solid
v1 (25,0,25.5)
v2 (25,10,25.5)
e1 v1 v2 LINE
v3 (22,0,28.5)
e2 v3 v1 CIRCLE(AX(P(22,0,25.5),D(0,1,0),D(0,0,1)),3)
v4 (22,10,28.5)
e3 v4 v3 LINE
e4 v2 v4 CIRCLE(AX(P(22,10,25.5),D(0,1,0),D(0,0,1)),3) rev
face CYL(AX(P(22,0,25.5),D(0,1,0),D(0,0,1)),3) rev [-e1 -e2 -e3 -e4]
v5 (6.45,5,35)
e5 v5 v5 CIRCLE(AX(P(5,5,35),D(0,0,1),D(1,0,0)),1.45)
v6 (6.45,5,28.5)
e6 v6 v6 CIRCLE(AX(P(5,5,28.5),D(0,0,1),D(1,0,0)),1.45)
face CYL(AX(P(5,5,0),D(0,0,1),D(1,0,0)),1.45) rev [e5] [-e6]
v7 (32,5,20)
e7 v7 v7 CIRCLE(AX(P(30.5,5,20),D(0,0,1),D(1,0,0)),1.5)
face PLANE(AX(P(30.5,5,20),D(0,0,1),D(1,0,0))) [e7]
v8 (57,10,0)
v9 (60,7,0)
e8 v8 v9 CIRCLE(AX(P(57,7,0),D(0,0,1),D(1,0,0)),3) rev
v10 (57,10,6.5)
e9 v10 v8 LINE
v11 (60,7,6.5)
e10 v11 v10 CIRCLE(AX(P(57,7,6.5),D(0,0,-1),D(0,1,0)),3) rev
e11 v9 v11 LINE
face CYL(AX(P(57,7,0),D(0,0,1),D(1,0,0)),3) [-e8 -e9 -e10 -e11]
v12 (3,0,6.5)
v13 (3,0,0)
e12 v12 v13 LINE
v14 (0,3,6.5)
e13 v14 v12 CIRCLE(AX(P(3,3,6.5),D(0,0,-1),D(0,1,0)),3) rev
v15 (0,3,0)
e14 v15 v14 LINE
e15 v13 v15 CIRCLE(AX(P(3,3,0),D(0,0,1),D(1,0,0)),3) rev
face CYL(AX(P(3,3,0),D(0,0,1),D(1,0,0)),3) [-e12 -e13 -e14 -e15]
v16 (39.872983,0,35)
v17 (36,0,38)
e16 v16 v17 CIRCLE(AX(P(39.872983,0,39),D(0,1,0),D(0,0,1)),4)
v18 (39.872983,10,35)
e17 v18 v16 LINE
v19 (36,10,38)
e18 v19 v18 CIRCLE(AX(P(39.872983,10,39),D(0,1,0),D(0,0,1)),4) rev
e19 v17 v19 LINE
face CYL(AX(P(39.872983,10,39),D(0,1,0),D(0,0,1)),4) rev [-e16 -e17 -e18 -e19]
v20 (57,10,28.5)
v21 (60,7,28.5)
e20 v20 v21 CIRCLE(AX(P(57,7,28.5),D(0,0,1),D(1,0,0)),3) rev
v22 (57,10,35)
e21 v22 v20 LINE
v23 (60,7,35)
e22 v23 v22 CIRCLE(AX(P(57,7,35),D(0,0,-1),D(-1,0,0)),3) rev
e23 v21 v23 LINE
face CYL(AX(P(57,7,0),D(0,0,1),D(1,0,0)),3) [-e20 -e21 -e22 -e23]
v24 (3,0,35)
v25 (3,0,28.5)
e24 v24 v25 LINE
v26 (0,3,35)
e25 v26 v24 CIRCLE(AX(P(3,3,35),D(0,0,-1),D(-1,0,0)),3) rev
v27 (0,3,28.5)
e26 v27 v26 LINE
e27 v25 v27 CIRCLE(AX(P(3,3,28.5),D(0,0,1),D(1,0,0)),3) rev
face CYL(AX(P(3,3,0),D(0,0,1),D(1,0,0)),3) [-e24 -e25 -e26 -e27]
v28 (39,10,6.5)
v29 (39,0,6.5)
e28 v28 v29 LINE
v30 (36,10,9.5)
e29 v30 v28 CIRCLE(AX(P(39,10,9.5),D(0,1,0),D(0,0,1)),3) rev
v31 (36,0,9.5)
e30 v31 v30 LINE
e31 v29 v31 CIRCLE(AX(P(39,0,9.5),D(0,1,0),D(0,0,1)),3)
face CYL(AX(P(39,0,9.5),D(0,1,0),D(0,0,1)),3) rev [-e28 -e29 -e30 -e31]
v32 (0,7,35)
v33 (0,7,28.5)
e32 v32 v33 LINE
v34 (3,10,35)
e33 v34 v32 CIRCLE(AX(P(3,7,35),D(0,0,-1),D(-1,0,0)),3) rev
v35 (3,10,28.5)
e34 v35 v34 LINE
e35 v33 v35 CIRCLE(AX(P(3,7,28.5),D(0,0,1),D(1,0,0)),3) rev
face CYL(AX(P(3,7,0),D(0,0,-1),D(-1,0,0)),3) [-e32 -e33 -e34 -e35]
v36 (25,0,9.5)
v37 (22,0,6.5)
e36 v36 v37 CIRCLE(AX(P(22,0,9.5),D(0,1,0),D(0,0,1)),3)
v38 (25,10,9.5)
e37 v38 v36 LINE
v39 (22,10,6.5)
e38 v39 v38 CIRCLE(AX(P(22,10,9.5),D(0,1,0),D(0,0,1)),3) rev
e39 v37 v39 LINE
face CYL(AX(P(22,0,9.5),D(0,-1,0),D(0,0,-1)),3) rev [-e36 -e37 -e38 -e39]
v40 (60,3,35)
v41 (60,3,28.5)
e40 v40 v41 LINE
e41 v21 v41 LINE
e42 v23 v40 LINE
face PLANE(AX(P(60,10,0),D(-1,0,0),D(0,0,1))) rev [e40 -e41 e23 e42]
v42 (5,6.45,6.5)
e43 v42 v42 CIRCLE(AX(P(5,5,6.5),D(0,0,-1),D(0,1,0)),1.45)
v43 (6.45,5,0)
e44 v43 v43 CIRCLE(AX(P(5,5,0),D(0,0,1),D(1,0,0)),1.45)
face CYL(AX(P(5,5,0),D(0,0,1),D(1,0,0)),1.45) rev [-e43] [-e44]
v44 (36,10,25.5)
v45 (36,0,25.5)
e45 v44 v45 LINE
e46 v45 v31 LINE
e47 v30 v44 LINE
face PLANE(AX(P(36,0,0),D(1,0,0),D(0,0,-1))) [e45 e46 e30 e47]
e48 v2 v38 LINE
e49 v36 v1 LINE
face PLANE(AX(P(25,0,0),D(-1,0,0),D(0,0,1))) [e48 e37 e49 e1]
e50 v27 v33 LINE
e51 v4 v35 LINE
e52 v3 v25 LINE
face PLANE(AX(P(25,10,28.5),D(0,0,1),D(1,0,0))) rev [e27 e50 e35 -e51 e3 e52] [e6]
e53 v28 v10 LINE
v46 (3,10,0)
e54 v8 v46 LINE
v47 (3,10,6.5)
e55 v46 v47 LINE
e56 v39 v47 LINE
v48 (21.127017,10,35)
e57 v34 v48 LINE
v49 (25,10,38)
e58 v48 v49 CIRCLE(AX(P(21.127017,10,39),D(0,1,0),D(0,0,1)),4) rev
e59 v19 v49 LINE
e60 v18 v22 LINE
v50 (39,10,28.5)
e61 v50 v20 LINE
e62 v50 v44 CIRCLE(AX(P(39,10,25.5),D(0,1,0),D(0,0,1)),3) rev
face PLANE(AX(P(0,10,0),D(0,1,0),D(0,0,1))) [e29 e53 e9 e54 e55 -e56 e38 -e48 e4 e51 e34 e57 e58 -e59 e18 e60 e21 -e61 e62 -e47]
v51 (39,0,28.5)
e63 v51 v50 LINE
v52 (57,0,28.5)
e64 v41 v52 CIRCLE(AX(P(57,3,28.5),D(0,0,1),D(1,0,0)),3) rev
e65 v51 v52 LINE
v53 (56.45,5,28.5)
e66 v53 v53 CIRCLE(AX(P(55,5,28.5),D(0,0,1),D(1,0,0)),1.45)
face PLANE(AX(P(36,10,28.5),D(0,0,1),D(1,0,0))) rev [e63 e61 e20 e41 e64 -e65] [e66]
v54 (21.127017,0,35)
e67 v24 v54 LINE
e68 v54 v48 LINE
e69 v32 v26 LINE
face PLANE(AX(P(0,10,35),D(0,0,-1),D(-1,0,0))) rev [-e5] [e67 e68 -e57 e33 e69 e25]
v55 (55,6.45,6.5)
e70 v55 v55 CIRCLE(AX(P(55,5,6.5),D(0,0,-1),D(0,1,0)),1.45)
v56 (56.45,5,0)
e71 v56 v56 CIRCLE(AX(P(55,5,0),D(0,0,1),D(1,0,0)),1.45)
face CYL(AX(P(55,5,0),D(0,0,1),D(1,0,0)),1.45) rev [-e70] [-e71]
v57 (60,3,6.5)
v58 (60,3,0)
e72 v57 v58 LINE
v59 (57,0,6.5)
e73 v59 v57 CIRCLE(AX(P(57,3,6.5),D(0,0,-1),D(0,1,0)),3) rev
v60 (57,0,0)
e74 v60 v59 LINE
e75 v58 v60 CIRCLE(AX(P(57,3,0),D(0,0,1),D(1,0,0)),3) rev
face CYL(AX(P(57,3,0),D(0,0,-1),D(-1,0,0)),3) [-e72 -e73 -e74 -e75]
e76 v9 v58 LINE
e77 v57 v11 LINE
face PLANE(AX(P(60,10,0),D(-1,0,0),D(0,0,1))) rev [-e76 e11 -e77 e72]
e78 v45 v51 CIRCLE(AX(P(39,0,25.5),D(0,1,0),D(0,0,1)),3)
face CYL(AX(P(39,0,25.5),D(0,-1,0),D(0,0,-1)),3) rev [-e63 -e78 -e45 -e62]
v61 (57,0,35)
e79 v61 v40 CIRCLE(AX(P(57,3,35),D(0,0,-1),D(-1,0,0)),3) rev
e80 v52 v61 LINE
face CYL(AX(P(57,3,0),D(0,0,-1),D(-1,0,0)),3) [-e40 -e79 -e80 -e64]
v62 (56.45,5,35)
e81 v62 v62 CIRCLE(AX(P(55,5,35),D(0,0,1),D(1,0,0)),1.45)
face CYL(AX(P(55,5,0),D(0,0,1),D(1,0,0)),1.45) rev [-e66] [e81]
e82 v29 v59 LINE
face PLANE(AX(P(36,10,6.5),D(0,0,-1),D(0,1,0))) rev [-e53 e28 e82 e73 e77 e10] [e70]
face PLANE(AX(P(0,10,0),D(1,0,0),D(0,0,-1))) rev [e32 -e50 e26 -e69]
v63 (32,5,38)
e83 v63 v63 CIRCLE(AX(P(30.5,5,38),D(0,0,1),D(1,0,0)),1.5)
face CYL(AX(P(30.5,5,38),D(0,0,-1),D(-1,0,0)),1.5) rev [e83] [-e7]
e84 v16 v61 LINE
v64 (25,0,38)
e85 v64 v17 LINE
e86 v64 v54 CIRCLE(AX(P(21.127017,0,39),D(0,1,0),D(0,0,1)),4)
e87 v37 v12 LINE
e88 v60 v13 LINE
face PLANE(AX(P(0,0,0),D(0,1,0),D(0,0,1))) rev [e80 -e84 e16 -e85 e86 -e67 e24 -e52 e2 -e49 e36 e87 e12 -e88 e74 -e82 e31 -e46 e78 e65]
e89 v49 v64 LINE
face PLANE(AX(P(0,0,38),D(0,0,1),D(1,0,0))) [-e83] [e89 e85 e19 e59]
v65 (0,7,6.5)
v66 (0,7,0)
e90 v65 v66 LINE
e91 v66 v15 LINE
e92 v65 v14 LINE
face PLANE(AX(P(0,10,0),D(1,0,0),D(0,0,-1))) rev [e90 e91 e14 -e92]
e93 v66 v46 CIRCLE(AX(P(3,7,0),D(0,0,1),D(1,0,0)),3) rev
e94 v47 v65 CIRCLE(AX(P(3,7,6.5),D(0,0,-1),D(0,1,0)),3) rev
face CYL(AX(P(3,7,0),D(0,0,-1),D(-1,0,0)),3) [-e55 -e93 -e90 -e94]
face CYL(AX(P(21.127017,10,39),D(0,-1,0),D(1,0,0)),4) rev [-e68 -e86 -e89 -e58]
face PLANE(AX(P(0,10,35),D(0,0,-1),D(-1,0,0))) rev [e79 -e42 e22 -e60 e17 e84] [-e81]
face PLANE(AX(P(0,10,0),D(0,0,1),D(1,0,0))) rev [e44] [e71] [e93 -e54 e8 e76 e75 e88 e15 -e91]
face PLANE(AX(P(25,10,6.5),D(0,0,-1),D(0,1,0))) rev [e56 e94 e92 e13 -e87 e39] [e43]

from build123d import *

# Parameters (mm, degrees)
SKETCH1_W               = 60
SKETCH1_H               = 35
BOSS_EXTRUDE1_DEPTH     = 10
SKETCH2_W               = 22
SKETCH2_H               = 10
CUT_EXTRUDE1_DEPTH      = 24
SKETCH3_W               = 22
SKETCH3_H               = 10
CUT_EXTRUDE2_DEPTH      = 25
SKETCH5_R               = 1.45
CUT_EXTRUDE4_DEPTH      = 71.178344238
FILLET1_R               = 3
FILLET2_R               = 3
SKETCH7_W               = 11
SKETCH7_H               = 10
BOSS_EXTRUDE2_DEPTH     = 3
CUT_EXTRUDE5_DEPTH      = 3
CUT_EXTRUDE5_DEPTH_BACK = 15
SKETCH6_R               = 1.5
FILLET3_R               = 4


with BuildPart() as part:
    # Sketch1 → Boss-Extrude1 (new body)
    with BuildSketch(Plane(origin=(0, 0, 0), x_dir=(1, 0, 0), z_dir=(0, 1, 0))):
        with Locations((30, -17.5)):
            Rectangle(SKETCH1_W, SKETCH1_H)
    extrude(amount=BOSS_EXTRUDE1_DEPTH)

    # Sketch2 → Cut-Extrude1 (cut)
    with BuildSketch(Plane(origin=(60, 0, 0), x_dir=(0, 0, -1), z_dir=(1, 0, 0))):
        with Locations((-17.5, 5)):
            Rectangle(SKETCH2_W, SKETCH2_H)
    extrude(amount=-CUT_EXTRUDE1_DEPTH, mode=Mode.SUBTRACT)

    # Sketch3 → Cut-Extrude2 (cut)
    with BuildSketch(Plane.ZY):
        with Locations((17.5, 5)):
            Rectangle(SKETCH3_W, SKETCH3_H)
    extrude(amount=-CUT_EXTRUDE2_DEPTH, mode=Mode.SUBTRACT)

    # Sketch5 → Cut-Extrude4 (cut, through all)
    with BuildSketch(Plane.XY.offset(35)):
        with Locations((5, 5)):
            Circle(SKETCH5_R)
        with Locations((55, 5)):
            Circle(SKETCH5_R)
    extrude(amount=-CUT_EXTRUDE4_DEPTH, mode=Mode.SUBTRACT)

    # Fillet1
    fillet1_edges = [part.edges().sort_by_distance(p)[0] for p in [
        (60, 10, 31.75),
        (60, 0, 3.25),
        (60, 10, 3.25),
        (0, 0, 31.75),
        (0, 10, 31.75),
        (0, 10, 3.25),
        (60, 0, 31.75),
        (0, 0, 3.25),
    ]]
    fillet(fillet1_edges, radius=FILLET1_R)

    # Fillet2
    fillet2_edges = [part.edges().sort_by_distance(p)[0] for p in [
        (36, 5, 28.5),
        (36, 5, 6.5),
        (25, 5, 6.5),
        (25, 5, 28.5),
    ]]
    fillet(fillet2_edges, radius=FILLET2_R)

    # Sketch7 → Boss-Extrude2 (add)
    with BuildSketch(Plane.XY.offset(35)):
        with Locations((30.5, 5)):
            Rectangle(SKETCH7_W, SKETCH7_H)
    extrude(amount=BOSS_EXTRUDE2_DEPTH)

    # Sketch6 → Cut-Extrude5 (cut, two sides: drawn at the far end of the back side and taken through both)
    with BuildSketch(Plane.XY.offset(35).offset(-CUT_EXTRUDE5_DEPTH_BACK)):
        with Locations((30.5, 5)):
            Circle(SKETCH6_R)
    extrude(amount=CUT_EXTRUDE5_DEPTH + CUT_EXTRUDE5_DEPTH_BACK, mode=Mode.SUBTRACT)

    # Fillet3
    # the kernel refuses this fillet: 4 mm, written as the material it adds along each edge
    with BuildSketch(Plane(origin=(36, 10, 35), x_dir=(0, 0, 1), z_dir=(0, -1, 0))) as fillet3_piece_1:
        with BuildLine():
            CenterArc((4, -3.872983346), FILLET3_R, 104.477512186, 75.522487814)
            Line((0, -3.872983346), (-0.08, -3.872983346))
            Line((-0.08, -3.872983346), (-0.08, 0))
            Line((-0.08, 0), (0, 0.08))
            ThreePointArc((0, 0.08), (1.5, 0.08), (2.98, 0.077459667))
            Line((2.98, 0.077459667), (3, 0))
        make_face()
    extrude(amount=10)
    with BuildSketch(Plane(origin=(25, 0, 35), x_dir=(-1, 0, 0), z_dir=(0, 1, 0))) as fillet3_piece_2:
        with BuildLine():
            CenterArc((3.872983346, 4), FILLET3_R, 194.477512186, 75.522487814)
            Line((0, 3), (-0.077459667, 2.98))
            ThreePointArc((-0.077459667, 2.98), (-0.08, 1.5), (-0.08, 0))
            Line((-0.08, 0), (0, -0.08))
            Line((0, -0.08), (3.872983346, -0.08))
            Line((3.872983346, -0.08), (3.872983346, 0))
        make_face()
    extrude(amount=10)


solid = part.part
